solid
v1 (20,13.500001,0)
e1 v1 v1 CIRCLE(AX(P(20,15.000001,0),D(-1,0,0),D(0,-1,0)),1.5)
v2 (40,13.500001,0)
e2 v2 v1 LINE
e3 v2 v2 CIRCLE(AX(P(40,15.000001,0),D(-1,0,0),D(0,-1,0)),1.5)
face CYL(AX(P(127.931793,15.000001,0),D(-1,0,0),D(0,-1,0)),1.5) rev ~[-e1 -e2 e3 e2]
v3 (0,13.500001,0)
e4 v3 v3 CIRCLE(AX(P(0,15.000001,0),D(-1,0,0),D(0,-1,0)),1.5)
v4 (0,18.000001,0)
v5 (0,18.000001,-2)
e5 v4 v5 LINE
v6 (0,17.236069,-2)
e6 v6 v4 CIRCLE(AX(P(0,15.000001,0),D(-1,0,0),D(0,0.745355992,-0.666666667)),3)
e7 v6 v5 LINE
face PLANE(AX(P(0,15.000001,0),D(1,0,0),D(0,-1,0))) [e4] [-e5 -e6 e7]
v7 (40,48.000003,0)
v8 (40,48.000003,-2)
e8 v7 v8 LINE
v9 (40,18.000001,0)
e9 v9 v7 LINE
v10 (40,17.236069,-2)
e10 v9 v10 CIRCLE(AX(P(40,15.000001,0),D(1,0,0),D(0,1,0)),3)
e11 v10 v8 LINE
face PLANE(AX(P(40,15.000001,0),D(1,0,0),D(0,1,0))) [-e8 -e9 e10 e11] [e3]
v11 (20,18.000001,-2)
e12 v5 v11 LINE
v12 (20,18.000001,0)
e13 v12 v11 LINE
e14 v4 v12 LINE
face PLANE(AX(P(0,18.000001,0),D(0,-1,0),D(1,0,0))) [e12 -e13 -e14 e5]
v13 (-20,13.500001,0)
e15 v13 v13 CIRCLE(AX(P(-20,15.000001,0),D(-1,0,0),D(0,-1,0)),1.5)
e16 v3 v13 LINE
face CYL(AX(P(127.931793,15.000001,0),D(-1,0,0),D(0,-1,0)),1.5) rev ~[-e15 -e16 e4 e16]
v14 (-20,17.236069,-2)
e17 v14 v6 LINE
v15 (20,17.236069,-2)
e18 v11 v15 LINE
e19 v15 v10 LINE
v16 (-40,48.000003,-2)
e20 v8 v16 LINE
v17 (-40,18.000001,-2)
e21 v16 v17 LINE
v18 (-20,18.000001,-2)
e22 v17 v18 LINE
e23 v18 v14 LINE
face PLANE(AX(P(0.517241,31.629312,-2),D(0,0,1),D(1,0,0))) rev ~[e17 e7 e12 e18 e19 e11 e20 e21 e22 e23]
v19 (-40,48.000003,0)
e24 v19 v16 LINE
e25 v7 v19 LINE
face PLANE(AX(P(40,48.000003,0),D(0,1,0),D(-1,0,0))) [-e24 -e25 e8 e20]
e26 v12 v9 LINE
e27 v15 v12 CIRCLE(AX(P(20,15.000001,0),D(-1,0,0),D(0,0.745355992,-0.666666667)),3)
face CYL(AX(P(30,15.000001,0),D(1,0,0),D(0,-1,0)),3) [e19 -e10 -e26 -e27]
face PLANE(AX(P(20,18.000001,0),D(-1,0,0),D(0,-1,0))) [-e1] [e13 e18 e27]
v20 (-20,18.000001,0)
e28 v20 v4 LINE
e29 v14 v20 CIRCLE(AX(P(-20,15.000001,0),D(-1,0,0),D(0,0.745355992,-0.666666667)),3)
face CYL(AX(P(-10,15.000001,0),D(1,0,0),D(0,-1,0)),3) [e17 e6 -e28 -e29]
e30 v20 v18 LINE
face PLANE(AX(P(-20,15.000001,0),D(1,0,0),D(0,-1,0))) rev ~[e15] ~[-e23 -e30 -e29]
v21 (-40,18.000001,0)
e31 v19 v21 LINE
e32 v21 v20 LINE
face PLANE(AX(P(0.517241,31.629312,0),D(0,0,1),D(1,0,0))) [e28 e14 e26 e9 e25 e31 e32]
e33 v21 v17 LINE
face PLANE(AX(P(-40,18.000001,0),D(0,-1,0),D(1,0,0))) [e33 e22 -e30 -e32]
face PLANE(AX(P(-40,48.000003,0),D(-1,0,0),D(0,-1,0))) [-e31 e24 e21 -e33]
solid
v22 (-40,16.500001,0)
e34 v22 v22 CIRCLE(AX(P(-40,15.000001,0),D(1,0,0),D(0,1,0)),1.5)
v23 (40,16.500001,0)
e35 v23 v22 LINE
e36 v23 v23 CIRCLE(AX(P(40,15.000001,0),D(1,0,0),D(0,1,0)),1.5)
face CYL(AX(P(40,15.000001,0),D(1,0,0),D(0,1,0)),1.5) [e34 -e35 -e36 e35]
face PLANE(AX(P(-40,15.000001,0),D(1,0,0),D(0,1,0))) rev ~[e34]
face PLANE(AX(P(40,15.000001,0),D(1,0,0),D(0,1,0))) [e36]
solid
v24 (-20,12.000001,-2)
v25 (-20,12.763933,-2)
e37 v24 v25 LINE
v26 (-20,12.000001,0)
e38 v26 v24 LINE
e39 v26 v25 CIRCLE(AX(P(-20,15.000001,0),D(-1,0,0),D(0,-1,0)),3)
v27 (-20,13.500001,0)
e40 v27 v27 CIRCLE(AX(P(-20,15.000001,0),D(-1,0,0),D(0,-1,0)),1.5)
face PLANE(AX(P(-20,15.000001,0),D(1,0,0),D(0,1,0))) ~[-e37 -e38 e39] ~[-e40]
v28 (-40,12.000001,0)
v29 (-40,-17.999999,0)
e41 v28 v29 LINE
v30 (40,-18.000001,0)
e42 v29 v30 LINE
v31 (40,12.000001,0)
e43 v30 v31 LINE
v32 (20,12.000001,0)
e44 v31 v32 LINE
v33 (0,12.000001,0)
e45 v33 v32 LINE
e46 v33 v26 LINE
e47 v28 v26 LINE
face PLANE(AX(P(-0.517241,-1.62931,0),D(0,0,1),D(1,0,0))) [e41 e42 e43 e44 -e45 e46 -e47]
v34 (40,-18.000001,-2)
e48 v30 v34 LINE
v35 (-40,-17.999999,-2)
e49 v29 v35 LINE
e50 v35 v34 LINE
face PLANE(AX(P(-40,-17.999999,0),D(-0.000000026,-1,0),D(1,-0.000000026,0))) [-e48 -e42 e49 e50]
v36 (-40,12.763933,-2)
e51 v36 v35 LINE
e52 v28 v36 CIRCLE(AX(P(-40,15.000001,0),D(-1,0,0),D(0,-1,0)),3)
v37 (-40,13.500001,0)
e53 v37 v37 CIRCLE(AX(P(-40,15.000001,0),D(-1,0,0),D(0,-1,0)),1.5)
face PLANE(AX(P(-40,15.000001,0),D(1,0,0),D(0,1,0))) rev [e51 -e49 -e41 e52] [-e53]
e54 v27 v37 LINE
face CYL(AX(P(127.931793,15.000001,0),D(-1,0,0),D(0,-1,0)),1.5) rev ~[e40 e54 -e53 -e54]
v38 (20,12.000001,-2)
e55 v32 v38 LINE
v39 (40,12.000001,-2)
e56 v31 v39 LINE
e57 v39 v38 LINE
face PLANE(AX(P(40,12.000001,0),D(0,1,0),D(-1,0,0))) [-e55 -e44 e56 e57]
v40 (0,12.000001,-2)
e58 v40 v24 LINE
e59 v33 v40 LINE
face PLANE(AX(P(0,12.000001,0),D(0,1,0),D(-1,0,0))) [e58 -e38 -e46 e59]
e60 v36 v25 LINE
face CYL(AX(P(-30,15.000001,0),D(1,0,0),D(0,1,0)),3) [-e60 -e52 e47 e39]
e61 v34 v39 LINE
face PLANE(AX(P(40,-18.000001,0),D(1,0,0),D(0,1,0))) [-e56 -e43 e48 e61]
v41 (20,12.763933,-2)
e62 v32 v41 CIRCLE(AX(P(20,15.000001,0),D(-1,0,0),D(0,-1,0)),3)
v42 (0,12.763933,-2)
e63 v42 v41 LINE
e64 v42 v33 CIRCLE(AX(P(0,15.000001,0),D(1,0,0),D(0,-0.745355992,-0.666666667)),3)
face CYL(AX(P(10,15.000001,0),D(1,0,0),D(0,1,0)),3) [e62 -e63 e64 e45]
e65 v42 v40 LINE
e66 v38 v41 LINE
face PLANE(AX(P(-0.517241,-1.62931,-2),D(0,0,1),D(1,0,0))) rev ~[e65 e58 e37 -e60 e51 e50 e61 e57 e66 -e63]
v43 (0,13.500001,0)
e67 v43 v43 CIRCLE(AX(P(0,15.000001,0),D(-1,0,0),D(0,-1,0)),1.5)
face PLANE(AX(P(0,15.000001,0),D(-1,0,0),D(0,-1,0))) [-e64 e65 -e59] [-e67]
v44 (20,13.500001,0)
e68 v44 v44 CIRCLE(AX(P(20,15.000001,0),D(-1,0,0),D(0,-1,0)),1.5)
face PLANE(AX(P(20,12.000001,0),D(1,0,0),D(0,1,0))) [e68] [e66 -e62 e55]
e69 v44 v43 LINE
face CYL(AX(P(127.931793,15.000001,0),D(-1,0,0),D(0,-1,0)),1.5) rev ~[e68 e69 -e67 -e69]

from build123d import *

# Parameters (mm, degrees)
F1_DEPTH = 2
F2_DEPTH = 2
F0_W     = 20
F0_H     = 3
F7_D     = 3
F7_2_D   = 3
F6_R     = 1.5
F8_DEPTH = 80


with BuildPart() as f1:
    # F0 (on Top) → F1 (new body)
    with BuildSketch(Plane.XY):
        Polygon((20, 15.0000010577), (40, 15.0000010577), (40, 48.0000031732), (-40, 48.0000031732), (-40, 18.0000010577), (-20, 18.0000010577), (-20, 15.0000010577), (0, 15.0000010577), (0, 18.0000010577), (20, 18.0000010577), align=None)
    extrude(amount=-F1_DEPTH)

    # F0 (on Top) → F4 (revolve)
    with BuildSketch(Plane.XY):
        with Locations((-10, 13.5000010577)):
            Rectangle(F0_W, F0_H)
        with Locations((30, 13.5000010577)):
            Rectangle(F0_W, F0_H)
    revolve(axis=Axis((0, 15.0000010577, 0), (1, 0, 0)))

    # F5: union 

    # F7 (through all)
    with Locations(Plane.YZ.offset(40)):
        with Locations((15.0000010577, 0)):
            Hole(F7_D / 2)


with BuildPart() as f2:
    # F0 (on Top) → F2 (new body)
    with BuildSketch(Plane.XY):
        Polygon((-40, -17.9999989423), (40, -18.0000010577), (40, 12.0000010577), (20, 12.0000010577), (20, 15.0000010577), (0, 15.0000010577), (0, 12.0000010577), (-20, 12.0000010577), (-20, 15.0000010577), (-40, 15.0000010577), align=None)
    extrude(amount=-F2_DEPTH)

    # F0 (on Top) → F3 (revolve)
    with BuildSketch(Plane.XY):
        with Locations((-30, 16.5000010577)):
            Rectangle(F0_W, F0_H)
        with Locations((10, 16.5000010577)):
            Rectangle(F0_W, F0_H)
    revolve(axis=Axis((0, 15.0000010577, 0), (1, 0, 0)))

    # F7#2 (through all)
    with Locations(Plane.YZ.offset(40)):
        with Locations((15.0000010577, 0)):
            Hole(F7_2_D / 2)


with BuildPart() as f8:
    # F6 (on face) → F8 (new body)
    with BuildSketch(Plane.YZ.offset(40)):
        with Locations((15.0000010577, 0)):
            Circle(F6_R)
    extrude(amount=-F8_DEPTH)


solid = Compound([f1.part, f2.part, f8.part])
